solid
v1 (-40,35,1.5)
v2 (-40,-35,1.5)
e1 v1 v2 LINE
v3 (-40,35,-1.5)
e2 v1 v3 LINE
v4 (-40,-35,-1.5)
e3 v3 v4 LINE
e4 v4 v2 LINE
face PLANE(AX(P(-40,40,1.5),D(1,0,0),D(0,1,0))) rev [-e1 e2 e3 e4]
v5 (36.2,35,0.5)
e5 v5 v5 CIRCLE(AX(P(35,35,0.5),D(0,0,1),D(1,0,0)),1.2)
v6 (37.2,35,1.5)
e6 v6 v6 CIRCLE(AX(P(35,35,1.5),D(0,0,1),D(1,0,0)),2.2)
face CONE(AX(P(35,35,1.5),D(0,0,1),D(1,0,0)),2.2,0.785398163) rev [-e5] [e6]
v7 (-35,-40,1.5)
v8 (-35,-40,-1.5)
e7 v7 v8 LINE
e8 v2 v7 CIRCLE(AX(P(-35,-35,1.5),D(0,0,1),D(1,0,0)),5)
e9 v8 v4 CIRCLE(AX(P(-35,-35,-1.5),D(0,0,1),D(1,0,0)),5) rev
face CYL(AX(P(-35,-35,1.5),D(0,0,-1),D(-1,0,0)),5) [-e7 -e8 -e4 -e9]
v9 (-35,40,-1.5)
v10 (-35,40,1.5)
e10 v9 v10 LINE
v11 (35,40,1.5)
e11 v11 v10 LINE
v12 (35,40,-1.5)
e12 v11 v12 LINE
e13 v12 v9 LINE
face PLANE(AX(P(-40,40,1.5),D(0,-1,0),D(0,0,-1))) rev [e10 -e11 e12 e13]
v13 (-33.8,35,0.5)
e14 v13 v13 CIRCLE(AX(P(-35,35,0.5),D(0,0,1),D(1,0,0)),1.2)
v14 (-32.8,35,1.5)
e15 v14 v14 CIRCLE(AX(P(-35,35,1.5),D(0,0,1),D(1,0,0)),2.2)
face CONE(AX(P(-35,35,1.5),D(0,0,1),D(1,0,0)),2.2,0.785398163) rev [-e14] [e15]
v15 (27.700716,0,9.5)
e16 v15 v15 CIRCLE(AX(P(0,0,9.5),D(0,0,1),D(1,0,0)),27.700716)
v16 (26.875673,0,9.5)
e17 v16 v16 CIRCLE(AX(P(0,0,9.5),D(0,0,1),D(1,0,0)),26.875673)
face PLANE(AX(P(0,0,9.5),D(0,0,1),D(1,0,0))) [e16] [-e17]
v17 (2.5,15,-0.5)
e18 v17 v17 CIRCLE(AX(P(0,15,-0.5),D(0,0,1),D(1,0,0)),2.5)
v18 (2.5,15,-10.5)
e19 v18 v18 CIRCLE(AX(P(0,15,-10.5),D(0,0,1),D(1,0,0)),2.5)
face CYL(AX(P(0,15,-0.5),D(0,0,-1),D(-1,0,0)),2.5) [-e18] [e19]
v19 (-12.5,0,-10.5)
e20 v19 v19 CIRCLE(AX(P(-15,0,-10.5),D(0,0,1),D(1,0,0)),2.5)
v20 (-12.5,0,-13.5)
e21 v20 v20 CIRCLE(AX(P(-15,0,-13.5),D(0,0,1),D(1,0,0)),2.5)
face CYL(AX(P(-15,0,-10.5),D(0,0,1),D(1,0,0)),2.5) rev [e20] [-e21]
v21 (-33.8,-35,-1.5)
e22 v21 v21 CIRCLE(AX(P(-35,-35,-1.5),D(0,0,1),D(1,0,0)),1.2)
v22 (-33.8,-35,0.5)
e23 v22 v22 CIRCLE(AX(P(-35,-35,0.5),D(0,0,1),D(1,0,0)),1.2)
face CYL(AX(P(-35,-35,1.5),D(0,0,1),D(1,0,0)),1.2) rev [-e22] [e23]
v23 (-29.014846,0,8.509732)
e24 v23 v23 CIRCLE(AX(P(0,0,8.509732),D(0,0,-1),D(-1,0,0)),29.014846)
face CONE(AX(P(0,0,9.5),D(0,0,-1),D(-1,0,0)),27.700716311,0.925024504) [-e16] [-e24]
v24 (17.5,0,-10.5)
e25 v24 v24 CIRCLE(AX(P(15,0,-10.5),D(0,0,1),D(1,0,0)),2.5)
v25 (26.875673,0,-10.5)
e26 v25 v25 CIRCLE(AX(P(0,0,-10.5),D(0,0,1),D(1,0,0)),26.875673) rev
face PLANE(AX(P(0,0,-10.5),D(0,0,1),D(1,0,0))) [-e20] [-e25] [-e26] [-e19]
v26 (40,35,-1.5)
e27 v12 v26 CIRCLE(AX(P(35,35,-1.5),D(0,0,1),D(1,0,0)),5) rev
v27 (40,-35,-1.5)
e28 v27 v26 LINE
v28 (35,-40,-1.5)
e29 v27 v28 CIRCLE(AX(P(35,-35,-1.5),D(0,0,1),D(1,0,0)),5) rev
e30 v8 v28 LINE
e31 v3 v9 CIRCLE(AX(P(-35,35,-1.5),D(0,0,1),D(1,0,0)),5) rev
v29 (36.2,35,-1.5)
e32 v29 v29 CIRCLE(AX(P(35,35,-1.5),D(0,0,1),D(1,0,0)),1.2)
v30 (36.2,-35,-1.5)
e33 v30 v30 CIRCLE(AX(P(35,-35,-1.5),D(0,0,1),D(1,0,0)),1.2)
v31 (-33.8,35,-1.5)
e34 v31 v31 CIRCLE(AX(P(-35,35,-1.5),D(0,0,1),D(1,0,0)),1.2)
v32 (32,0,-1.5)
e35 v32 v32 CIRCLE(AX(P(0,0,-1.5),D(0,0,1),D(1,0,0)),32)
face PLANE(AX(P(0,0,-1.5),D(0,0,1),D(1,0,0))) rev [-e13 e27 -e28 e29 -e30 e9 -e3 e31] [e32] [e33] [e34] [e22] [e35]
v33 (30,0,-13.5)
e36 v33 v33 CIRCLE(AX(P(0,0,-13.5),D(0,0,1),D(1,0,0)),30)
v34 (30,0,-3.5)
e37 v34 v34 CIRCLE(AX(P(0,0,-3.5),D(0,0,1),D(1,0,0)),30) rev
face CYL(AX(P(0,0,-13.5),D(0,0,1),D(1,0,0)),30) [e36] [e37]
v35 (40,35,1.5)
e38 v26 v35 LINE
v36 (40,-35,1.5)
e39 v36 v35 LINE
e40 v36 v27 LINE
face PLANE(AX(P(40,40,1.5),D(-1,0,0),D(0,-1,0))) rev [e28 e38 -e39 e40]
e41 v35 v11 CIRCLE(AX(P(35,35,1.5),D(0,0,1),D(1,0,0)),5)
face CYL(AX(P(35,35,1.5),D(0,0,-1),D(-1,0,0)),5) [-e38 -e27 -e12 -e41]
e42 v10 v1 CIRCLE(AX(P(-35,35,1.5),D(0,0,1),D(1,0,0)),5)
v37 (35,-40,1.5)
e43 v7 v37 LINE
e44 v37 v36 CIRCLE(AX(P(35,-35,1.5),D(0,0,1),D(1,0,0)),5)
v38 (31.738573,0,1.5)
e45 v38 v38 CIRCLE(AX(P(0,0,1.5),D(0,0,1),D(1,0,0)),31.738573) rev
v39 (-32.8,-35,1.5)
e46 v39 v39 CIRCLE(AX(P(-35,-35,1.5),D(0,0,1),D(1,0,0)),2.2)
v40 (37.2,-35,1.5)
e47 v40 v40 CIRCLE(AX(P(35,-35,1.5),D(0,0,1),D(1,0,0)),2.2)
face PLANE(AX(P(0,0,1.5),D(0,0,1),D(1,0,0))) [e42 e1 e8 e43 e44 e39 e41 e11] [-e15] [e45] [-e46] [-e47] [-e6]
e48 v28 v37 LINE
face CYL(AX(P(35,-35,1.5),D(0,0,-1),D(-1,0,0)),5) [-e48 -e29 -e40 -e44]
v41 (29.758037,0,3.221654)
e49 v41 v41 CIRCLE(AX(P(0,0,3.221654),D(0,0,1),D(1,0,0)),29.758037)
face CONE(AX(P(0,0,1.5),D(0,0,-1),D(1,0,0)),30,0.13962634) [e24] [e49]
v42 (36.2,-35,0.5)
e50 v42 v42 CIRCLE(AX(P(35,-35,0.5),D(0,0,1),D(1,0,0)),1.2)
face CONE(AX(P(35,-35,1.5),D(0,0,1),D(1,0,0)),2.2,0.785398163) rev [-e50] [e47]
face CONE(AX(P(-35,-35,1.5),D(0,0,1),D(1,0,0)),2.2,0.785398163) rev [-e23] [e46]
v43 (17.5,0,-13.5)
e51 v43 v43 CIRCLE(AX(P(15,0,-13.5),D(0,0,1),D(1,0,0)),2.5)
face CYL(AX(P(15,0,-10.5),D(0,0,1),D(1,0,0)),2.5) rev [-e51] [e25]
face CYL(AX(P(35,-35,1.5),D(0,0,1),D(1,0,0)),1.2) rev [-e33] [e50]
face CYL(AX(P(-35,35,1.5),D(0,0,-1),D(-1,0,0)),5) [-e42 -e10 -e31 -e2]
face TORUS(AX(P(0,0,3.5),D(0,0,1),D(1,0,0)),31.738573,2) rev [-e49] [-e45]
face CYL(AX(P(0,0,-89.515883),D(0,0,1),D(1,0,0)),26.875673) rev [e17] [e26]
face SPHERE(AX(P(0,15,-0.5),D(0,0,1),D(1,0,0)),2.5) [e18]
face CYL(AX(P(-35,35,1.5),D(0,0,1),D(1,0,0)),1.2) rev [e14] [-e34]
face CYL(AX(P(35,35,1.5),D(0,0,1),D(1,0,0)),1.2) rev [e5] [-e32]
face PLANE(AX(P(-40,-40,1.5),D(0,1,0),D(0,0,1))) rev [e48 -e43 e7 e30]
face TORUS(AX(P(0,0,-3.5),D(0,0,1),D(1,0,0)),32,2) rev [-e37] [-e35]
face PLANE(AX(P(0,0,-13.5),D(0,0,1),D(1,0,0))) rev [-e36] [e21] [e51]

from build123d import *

# Parameters (mm, degrees)
PROFIL_BASE_W                                  = 80
PROFIL_BASE_H                                  = 80
BOSS_EXTRU_1_DEPTH                             = 1.5
CONG_1_R                                       = 5
ESQUISSE2_R                                    = 30
BOSS_EXTRU_2_DEPTH                             = 8
BOSS_EXTRU_2_TAPER                             = 8
BOSS_EXTRU_2_OTHER_WAY_DEPTH                   = 15
ESQUISSE4_R                                    = 26.875673322
ENL_V_MAT_EXTRU_1_DEPTH                        = 20
DIAM_TRE_DU_PER_AGE_0_15_5_1_D                 = 5
ESQUISSE8_R                                    = 2.5
BOSS_EXTRU_3_DEPTH                             = 10
R_VOLUTION1_ANGLE                              = 180
CHANFREIN1_SIZE                                = 1
CHANFREIN1_SIZE_2                              = 1.174957012
CONG_2_R                                       = 2
FRAISAGE_POUR_VIS_T_TE_FRAIS_E_M21_D           = 2.4
FRAISAGE_POUR_VIS_T_TE_FRAIS_E_M21_CSINK_D     = 4.4
FRAISAGE_POUR_VIS_T_TE_FRAIS_E_M21_CSINK_ANGLE = 90


with BuildPart() as part:
    # Profil Base → Boss.-Extru.1 (new, symmetric)
    with BuildSketch(Plane.XY):
        Rectangle(PROFIL_BASE_W, PROFIL_BASE_H)
    extrude(amount=BOSS_EXTRU_1_DEPTH, both=True)

    # Congé1
    cong_1_edges = [part.edges().sort_by_distance(p)[0] for p in [
        (40, -40, 0),
        (-40, -40, 0),
        (-40, 40, 0),
        (40, 40, 0),
    ]]
    fillet(cong_1_edges, radius=CONG_1_R)

    # Esquisse2 → Boss.-Extru.2 (add)
    with BuildSketch(Plane.XY.offset(1.5)):
        Circle(ESQUISSE2_R)
    extrude(amount=BOSS_EXTRU_2_DEPTH, taper=BOSS_EXTRU_2_TAPER)

    # Esquisse2 → Boss.-Extru.2 other way (add)
    with BuildSketch(Plane.XY.offset(1.5)):
        Circle(ESQUISSE2_R)
    extrude(amount=-BOSS_EXTRU_2_OTHER_WAY_DEPTH)

    # Esquisse4 → Enlèv. mat.-Extru.1 (cut)
    with BuildSketch(Plane.XY.offset(9.5)):
        Circle(ESQUISSE4_R)
    extrude(amount=-ENL_V_MAT_EXTRU_1_DEPTH, mode=Mode.SUBTRACT)

    # Diamètre du perçage Ø0.15 (5)1 (through all)
    with Locations(Plane.XY.offset(-10.5)):
        with Locations((-15, 0), (15, 0)):
            Hole(DIAM_TRE_DU_PER_AGE_0_15_5_1_D / 2)

    # Esquisse8 → Boss.-Extru.3 (add)
    with BuildSketch(Plane.XY.offset(-10.5)):
        with Locations((0, 15)):
            Circle(ESQUISSE8_R)
    extrude(amount=BOSS_EXTRU_3_DEPTH)

    # Esquisse9 → Révolution1 (revolve)
    with BuildSketch(Plane.XY.offset(-0.5)):
        with BuildLine():
            Line((0, 17.5), (0, 12.5))
            ThreePointArc((0, 12.5), (2.5, 15), (0, 17.5))
        make_face()
    revolve(axis=Axis((0, 17.5, -0.5), (0, -1, 0)), revolution_arc=R_VOLUTION1_ANGLE)

    # Chanfrein1
    # the kernel refuses this chamfer: 1.174957012, 1 mm, written as the material it takes off along each edge
    with BuildSketch(Plane(origin=(0, 0, 9.5), x_dir=(1, 0, 0), z_dir=(0, 1, 0))) as chanfrein1_piece_1:
        Polygon((28.875673322 + CHANFREIN1_SIZE * 0.13917310096, CHANFREIN1_SIZE * 0.990268068742), (28.875673322 - CHANFREIN1_SIZE_2, 0), (28.875673322, 0), align=None)
    revolve(axis=Axis((0, 0, 9.5), (0, 0, -1)), mode=Mode.SUBTRACT)

    # Congé2
    cong_2_edges = [part.edges().sort_by_distance(p)[0] for p in [
        (-30, 0, -1.5),
        (-30, 0, 1.5),
    ]]
    fillet(cong_2_edges, radius=CONG_2_R)

    # Fraisage pour vis à tête fraisée M21 (through all)
    with Locations(Plane.XY.offset(1.5)):
        with Locations((-35, 35), (35, 35), (-35, -35), (35, -35)):
            CounterSinkHole(FRAISAGE_POUR_VIS_T_TE_FRAIS_E_M21_D / 2, FRAISAGE_POUR_VIS_T_TE_FRAIS_E_M21_CSINK_D / 2, counter_sink_angle=FRAISAGE_POUR_VIS_T_TE_FRAIS_E_M21_CSINK_ANGLE)


solid = part.part
